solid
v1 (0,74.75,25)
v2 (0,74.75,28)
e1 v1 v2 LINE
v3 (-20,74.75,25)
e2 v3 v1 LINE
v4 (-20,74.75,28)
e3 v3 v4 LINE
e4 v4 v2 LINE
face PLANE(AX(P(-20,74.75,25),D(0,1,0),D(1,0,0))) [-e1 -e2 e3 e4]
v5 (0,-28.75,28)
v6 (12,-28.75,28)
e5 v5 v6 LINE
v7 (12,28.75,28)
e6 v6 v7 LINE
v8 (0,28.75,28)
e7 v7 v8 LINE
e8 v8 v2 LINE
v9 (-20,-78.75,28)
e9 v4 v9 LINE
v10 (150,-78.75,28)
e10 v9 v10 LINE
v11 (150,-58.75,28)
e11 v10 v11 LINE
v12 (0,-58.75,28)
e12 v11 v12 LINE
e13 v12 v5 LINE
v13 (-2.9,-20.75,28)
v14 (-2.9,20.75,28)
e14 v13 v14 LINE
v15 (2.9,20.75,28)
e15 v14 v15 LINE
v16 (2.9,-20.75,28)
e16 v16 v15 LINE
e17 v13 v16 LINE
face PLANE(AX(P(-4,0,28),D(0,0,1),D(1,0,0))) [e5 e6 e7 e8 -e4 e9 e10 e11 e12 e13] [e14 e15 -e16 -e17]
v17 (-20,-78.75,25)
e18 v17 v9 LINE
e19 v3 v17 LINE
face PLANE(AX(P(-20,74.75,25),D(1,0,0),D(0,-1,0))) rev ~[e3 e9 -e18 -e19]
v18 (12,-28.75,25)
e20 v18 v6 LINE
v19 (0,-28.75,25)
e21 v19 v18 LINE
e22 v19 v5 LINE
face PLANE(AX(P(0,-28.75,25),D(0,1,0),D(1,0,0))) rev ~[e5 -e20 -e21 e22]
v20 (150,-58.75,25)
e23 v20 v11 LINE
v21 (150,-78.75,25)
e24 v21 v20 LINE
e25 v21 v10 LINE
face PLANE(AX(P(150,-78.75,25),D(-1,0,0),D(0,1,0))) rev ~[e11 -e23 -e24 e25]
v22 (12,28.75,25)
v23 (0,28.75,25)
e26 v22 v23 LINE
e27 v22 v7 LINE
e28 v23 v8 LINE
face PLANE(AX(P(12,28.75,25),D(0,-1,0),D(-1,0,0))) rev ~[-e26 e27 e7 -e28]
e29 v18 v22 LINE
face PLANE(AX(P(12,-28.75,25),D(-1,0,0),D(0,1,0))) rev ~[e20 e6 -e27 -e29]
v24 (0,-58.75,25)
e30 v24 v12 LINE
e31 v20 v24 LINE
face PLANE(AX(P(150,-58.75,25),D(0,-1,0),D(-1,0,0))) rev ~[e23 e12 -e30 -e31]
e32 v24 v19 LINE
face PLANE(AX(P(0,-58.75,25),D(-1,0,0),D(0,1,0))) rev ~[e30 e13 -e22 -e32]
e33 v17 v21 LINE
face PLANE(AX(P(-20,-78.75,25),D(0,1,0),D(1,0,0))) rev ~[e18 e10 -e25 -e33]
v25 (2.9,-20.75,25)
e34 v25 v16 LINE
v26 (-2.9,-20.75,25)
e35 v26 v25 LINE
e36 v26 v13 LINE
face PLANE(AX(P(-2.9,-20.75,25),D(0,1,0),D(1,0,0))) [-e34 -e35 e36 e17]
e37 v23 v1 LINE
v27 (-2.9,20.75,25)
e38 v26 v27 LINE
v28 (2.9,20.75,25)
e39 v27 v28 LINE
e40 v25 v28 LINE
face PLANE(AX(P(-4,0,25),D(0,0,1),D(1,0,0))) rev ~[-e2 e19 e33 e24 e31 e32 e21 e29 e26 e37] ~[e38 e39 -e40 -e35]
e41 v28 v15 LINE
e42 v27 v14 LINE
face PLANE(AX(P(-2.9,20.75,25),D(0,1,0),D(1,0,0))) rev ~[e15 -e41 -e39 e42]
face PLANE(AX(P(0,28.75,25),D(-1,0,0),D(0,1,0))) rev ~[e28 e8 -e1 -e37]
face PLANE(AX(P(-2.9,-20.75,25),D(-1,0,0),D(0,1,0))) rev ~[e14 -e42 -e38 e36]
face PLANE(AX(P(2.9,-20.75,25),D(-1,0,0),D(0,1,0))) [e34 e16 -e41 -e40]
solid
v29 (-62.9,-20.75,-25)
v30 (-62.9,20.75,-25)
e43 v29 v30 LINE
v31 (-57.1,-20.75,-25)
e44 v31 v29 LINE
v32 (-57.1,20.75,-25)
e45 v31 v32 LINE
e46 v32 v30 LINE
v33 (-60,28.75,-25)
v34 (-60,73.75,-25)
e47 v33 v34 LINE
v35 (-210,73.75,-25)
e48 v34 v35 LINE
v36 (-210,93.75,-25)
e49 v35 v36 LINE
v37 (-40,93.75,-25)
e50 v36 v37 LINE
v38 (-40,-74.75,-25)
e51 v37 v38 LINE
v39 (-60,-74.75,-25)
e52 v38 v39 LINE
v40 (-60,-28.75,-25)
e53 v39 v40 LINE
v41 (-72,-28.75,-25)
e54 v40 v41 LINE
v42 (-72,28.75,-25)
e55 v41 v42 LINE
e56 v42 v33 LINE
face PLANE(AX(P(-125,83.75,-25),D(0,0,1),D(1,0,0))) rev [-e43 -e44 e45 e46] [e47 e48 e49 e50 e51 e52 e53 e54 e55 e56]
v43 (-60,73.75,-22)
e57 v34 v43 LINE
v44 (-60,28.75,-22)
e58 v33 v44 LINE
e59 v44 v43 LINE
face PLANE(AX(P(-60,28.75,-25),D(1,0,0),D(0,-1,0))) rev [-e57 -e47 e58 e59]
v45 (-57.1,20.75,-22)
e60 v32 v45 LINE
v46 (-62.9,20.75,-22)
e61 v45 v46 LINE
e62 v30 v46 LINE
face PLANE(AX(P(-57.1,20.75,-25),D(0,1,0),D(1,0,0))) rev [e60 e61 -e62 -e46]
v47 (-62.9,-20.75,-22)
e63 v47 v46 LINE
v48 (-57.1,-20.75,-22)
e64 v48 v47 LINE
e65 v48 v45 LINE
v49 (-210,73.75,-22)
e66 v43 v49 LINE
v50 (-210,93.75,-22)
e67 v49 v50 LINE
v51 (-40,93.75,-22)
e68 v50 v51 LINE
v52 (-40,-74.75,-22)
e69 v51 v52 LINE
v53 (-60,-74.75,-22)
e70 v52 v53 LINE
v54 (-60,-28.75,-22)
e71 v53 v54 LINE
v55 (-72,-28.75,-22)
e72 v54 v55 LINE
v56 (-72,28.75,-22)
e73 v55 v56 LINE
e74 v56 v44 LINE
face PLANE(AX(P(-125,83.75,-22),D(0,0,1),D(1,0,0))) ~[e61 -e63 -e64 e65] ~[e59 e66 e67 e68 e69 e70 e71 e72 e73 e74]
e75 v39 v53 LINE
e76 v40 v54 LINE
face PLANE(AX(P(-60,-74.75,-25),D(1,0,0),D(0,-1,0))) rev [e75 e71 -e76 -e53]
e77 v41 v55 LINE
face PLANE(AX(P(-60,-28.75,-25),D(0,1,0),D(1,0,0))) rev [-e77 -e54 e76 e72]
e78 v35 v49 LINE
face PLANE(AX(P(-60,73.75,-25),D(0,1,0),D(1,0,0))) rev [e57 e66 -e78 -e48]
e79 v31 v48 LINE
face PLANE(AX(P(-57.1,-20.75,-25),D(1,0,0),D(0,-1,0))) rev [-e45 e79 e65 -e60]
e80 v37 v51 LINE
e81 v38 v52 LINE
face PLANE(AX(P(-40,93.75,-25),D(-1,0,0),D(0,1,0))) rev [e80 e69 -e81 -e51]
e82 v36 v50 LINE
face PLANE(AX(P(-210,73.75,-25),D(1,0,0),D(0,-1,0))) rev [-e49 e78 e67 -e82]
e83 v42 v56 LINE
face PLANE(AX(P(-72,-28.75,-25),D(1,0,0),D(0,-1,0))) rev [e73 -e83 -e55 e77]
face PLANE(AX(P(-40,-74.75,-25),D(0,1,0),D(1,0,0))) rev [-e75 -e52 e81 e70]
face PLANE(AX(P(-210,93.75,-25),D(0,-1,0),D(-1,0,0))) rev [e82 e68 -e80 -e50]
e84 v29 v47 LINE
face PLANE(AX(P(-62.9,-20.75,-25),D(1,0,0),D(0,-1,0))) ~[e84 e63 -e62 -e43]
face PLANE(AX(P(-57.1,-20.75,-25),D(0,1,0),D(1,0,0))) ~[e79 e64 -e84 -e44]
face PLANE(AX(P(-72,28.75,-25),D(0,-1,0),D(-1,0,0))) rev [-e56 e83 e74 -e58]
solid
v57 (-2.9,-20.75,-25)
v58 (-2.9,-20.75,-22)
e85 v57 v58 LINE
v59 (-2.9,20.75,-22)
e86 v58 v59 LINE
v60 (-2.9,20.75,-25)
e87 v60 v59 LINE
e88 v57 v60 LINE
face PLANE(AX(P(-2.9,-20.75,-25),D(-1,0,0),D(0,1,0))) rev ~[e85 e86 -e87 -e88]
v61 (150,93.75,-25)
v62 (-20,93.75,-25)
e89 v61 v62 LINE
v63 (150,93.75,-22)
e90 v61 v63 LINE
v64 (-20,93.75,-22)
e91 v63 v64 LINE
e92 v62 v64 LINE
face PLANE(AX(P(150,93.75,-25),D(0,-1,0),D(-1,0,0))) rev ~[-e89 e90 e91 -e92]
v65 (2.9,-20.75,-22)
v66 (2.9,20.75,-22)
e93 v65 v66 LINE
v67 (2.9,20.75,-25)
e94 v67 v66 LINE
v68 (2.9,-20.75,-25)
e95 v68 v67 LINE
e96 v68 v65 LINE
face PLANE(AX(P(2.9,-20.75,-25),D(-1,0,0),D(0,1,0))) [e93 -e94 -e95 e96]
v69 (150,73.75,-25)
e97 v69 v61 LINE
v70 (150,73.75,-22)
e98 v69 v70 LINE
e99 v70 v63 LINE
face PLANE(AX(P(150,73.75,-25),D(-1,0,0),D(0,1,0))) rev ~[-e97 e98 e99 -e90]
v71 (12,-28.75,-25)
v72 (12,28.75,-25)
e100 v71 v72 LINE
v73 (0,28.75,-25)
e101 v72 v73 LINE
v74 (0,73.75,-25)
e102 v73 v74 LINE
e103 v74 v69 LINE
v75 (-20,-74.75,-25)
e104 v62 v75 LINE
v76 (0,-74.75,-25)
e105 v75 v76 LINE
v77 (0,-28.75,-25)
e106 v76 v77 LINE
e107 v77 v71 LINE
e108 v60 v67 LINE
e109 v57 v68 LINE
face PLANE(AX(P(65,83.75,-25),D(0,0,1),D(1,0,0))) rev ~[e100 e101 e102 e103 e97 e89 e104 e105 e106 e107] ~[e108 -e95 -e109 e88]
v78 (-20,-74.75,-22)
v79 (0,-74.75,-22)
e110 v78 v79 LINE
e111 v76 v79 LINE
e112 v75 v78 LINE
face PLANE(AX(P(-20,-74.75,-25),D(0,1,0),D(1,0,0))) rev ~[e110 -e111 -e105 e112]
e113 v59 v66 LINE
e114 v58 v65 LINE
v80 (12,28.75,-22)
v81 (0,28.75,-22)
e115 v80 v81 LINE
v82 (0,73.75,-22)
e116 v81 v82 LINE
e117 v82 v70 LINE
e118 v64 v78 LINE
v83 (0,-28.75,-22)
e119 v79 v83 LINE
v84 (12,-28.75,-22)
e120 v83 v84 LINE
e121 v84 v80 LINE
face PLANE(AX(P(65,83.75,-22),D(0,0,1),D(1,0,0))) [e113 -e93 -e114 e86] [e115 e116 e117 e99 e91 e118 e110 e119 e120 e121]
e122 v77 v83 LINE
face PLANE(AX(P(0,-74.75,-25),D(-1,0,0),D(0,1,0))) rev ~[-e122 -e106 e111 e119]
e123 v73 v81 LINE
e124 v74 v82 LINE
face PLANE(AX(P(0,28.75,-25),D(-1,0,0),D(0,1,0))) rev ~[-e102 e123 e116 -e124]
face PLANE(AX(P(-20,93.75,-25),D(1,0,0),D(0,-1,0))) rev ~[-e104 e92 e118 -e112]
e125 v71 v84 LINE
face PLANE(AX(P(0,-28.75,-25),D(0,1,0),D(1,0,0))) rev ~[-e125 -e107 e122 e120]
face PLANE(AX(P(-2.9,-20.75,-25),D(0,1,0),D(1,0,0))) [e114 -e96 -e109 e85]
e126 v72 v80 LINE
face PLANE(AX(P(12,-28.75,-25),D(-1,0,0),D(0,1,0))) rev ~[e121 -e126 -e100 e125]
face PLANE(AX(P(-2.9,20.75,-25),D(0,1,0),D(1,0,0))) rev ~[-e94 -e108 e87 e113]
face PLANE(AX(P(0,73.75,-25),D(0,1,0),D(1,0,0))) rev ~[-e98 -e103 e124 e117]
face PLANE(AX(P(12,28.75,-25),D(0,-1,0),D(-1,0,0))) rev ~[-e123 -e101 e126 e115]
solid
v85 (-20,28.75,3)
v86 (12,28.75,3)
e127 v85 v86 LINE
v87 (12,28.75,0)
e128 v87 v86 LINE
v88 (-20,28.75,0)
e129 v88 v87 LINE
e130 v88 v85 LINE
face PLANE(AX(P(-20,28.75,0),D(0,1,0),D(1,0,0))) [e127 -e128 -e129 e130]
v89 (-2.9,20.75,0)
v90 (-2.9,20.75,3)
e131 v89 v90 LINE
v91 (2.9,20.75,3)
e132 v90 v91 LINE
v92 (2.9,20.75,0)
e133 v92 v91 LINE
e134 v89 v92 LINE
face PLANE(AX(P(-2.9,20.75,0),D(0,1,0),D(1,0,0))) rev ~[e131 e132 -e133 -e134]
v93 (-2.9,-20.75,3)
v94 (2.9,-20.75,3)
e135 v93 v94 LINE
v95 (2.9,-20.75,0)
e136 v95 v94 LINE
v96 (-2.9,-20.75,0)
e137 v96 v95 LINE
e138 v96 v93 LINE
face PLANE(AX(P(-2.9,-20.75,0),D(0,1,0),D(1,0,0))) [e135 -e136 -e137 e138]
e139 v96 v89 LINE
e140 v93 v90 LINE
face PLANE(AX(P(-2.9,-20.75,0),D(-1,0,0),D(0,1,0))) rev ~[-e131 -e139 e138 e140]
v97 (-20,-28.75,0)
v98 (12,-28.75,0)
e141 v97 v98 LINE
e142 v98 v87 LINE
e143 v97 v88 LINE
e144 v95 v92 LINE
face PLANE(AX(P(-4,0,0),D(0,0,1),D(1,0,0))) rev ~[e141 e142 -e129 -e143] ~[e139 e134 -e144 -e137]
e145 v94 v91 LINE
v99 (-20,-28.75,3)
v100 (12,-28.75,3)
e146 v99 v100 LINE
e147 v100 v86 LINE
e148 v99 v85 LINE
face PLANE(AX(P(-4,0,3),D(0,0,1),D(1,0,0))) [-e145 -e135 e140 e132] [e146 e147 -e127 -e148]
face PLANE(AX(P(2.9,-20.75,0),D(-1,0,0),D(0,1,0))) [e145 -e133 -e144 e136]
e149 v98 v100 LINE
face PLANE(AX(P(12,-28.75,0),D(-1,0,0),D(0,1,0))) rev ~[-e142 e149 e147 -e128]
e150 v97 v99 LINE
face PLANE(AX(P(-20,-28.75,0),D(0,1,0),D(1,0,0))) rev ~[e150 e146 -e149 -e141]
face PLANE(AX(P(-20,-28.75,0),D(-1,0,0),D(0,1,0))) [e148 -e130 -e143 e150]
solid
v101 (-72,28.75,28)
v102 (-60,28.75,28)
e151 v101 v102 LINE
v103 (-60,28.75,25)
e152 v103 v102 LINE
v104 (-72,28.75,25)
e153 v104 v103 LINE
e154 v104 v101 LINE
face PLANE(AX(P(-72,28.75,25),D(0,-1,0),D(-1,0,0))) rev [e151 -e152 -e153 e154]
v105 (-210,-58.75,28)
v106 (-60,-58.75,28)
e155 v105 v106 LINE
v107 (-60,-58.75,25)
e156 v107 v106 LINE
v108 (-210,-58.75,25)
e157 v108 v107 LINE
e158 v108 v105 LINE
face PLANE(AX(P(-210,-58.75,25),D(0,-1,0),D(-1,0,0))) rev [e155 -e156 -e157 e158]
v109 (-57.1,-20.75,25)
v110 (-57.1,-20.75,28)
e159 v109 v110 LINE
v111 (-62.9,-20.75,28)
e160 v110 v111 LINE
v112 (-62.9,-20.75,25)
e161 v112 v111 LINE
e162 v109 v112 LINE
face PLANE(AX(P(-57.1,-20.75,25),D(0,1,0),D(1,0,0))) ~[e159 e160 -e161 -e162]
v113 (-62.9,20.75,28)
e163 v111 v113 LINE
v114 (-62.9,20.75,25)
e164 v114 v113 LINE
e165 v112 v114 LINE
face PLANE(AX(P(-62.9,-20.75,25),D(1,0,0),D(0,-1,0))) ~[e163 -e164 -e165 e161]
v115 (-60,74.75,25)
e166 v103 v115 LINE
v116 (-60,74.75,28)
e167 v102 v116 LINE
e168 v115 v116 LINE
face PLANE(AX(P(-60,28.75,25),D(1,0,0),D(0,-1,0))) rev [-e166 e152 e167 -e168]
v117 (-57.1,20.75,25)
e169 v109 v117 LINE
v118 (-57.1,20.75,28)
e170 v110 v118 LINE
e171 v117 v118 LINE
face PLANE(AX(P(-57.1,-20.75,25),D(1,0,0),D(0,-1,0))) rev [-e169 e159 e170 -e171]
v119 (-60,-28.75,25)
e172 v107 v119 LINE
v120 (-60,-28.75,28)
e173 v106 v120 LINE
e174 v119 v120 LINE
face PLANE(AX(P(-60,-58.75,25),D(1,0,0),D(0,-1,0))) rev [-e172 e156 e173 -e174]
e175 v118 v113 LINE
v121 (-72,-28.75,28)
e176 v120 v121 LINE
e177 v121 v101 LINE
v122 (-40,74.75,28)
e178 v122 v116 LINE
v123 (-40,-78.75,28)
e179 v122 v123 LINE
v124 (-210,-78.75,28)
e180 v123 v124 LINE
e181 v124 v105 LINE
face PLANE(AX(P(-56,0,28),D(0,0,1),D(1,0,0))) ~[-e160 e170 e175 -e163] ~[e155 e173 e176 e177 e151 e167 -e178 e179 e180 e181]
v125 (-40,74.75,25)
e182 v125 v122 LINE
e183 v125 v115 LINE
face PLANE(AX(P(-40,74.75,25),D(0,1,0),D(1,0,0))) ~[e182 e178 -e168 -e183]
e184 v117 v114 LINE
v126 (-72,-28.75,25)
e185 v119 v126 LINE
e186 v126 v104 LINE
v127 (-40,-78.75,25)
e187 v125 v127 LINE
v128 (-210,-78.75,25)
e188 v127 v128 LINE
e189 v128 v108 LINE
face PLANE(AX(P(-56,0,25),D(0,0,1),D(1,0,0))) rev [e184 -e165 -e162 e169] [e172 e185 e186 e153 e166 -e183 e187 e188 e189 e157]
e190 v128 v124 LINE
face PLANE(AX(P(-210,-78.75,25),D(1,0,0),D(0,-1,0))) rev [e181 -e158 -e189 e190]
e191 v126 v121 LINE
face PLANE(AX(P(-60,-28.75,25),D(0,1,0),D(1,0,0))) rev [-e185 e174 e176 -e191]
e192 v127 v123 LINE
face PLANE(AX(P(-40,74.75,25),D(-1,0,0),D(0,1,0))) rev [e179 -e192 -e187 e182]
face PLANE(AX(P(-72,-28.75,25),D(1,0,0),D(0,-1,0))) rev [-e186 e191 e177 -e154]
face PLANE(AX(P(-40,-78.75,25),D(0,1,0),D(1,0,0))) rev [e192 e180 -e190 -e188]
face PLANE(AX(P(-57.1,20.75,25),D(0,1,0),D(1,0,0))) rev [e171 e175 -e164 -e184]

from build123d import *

# Parameters (mm, degrees)
F0_W      = 32
F0_H      = 57.5
F0_W_2    = 5.8
F0_H_2    = 41.5
F1_DEPTH  = 3
F3_W      = 5.8
F3_H      = 41.5
F3_W_2    = 20
F3_H_2    = 30
F3_H_3    = 46
F4_DEPTH  = 3
F9_W      = 20
F9_H      = 45
F9_W_2    = 5.8
F9_H_2    = 41.5
F9_H_3    = 46
F10_DEPTH = 3


# Not quite as in the source:
# - a feature names something its author has since deleted; it is built from what else it names


with BuildPart() as f1:
    # F0 (on Top) → F1 (new body)
    with BuildSketch(Plane.XY):
        with Locations((-4, 0)):
            Rectangle(F0_W, F0_H)
        Rectangle(F0_W_2, F0_H_2, mode=Mode.SUBTRACT)
    extrude(amount=F1_DEPTH)


with BuildPart() as f4:
    # F3 (on offset) → F4 (new body)
    with BuildSketch(Plane.XY.offset(25)):
        Polygon((0, 28.75), (-20, 28.75), (-20, -28.75), (0, -28.75), (12, -28.75), (12, 28.75), align=None)
        Rectangle(F3_W, F3_H, mode=Mode.SUBTRACT)
        with Locations((-10, -43.75)):
            Rectangle(F3_W_2, F3_H_2)
        Polygon((0, -58.75), (-20, -58.75), (-20, -78.75), (150, -78.75), (150, -58.75), align=None)
        with Locations((-10, 51.75)):
            Rectangle(F3_W_2, F3_H_3)
    extrude(amount=F4_DEPTH)


with BuildPart() as f6_1:
    # F6: instance of F4
    add(f4.part.mirror(Plane.YZ.offset(-30)))


with BuildPart() as f10:
    # F9 (on offset) → F10 (new body)
    with BuildSketch(Plane.XY.offset(-25)):
        Polygon((-20, 93.75), (-20, 73.75), (0, 73.75), (150, 73.75), (150, 93.75), align=None)
        with Locations((-10, 51.25)):
            Rectangle(F9_W, F9_H)
        Polygon((-20, 28.75), (-20, -28.75), (0, -28.75), (12, -28.75), (12, 28.75), (0, 28.75), align=None)
        Rectangle(F9_W_2, F9_H_2, mode=Mode.SUBTRACT)
        with Locations((-10, -51.75)):
            Rectangle(F9_W, F9_H_3)
    extrude(amount=F10_DEPTH)


with BuildPart() as f11_1:
    # F11: instance of F10
    add(f10.part.mirror(Plane.YZ.offset(-30)))


solid = Compound([f1.part, f4.part, f6_1.part, f10.part, f11_1.part])
